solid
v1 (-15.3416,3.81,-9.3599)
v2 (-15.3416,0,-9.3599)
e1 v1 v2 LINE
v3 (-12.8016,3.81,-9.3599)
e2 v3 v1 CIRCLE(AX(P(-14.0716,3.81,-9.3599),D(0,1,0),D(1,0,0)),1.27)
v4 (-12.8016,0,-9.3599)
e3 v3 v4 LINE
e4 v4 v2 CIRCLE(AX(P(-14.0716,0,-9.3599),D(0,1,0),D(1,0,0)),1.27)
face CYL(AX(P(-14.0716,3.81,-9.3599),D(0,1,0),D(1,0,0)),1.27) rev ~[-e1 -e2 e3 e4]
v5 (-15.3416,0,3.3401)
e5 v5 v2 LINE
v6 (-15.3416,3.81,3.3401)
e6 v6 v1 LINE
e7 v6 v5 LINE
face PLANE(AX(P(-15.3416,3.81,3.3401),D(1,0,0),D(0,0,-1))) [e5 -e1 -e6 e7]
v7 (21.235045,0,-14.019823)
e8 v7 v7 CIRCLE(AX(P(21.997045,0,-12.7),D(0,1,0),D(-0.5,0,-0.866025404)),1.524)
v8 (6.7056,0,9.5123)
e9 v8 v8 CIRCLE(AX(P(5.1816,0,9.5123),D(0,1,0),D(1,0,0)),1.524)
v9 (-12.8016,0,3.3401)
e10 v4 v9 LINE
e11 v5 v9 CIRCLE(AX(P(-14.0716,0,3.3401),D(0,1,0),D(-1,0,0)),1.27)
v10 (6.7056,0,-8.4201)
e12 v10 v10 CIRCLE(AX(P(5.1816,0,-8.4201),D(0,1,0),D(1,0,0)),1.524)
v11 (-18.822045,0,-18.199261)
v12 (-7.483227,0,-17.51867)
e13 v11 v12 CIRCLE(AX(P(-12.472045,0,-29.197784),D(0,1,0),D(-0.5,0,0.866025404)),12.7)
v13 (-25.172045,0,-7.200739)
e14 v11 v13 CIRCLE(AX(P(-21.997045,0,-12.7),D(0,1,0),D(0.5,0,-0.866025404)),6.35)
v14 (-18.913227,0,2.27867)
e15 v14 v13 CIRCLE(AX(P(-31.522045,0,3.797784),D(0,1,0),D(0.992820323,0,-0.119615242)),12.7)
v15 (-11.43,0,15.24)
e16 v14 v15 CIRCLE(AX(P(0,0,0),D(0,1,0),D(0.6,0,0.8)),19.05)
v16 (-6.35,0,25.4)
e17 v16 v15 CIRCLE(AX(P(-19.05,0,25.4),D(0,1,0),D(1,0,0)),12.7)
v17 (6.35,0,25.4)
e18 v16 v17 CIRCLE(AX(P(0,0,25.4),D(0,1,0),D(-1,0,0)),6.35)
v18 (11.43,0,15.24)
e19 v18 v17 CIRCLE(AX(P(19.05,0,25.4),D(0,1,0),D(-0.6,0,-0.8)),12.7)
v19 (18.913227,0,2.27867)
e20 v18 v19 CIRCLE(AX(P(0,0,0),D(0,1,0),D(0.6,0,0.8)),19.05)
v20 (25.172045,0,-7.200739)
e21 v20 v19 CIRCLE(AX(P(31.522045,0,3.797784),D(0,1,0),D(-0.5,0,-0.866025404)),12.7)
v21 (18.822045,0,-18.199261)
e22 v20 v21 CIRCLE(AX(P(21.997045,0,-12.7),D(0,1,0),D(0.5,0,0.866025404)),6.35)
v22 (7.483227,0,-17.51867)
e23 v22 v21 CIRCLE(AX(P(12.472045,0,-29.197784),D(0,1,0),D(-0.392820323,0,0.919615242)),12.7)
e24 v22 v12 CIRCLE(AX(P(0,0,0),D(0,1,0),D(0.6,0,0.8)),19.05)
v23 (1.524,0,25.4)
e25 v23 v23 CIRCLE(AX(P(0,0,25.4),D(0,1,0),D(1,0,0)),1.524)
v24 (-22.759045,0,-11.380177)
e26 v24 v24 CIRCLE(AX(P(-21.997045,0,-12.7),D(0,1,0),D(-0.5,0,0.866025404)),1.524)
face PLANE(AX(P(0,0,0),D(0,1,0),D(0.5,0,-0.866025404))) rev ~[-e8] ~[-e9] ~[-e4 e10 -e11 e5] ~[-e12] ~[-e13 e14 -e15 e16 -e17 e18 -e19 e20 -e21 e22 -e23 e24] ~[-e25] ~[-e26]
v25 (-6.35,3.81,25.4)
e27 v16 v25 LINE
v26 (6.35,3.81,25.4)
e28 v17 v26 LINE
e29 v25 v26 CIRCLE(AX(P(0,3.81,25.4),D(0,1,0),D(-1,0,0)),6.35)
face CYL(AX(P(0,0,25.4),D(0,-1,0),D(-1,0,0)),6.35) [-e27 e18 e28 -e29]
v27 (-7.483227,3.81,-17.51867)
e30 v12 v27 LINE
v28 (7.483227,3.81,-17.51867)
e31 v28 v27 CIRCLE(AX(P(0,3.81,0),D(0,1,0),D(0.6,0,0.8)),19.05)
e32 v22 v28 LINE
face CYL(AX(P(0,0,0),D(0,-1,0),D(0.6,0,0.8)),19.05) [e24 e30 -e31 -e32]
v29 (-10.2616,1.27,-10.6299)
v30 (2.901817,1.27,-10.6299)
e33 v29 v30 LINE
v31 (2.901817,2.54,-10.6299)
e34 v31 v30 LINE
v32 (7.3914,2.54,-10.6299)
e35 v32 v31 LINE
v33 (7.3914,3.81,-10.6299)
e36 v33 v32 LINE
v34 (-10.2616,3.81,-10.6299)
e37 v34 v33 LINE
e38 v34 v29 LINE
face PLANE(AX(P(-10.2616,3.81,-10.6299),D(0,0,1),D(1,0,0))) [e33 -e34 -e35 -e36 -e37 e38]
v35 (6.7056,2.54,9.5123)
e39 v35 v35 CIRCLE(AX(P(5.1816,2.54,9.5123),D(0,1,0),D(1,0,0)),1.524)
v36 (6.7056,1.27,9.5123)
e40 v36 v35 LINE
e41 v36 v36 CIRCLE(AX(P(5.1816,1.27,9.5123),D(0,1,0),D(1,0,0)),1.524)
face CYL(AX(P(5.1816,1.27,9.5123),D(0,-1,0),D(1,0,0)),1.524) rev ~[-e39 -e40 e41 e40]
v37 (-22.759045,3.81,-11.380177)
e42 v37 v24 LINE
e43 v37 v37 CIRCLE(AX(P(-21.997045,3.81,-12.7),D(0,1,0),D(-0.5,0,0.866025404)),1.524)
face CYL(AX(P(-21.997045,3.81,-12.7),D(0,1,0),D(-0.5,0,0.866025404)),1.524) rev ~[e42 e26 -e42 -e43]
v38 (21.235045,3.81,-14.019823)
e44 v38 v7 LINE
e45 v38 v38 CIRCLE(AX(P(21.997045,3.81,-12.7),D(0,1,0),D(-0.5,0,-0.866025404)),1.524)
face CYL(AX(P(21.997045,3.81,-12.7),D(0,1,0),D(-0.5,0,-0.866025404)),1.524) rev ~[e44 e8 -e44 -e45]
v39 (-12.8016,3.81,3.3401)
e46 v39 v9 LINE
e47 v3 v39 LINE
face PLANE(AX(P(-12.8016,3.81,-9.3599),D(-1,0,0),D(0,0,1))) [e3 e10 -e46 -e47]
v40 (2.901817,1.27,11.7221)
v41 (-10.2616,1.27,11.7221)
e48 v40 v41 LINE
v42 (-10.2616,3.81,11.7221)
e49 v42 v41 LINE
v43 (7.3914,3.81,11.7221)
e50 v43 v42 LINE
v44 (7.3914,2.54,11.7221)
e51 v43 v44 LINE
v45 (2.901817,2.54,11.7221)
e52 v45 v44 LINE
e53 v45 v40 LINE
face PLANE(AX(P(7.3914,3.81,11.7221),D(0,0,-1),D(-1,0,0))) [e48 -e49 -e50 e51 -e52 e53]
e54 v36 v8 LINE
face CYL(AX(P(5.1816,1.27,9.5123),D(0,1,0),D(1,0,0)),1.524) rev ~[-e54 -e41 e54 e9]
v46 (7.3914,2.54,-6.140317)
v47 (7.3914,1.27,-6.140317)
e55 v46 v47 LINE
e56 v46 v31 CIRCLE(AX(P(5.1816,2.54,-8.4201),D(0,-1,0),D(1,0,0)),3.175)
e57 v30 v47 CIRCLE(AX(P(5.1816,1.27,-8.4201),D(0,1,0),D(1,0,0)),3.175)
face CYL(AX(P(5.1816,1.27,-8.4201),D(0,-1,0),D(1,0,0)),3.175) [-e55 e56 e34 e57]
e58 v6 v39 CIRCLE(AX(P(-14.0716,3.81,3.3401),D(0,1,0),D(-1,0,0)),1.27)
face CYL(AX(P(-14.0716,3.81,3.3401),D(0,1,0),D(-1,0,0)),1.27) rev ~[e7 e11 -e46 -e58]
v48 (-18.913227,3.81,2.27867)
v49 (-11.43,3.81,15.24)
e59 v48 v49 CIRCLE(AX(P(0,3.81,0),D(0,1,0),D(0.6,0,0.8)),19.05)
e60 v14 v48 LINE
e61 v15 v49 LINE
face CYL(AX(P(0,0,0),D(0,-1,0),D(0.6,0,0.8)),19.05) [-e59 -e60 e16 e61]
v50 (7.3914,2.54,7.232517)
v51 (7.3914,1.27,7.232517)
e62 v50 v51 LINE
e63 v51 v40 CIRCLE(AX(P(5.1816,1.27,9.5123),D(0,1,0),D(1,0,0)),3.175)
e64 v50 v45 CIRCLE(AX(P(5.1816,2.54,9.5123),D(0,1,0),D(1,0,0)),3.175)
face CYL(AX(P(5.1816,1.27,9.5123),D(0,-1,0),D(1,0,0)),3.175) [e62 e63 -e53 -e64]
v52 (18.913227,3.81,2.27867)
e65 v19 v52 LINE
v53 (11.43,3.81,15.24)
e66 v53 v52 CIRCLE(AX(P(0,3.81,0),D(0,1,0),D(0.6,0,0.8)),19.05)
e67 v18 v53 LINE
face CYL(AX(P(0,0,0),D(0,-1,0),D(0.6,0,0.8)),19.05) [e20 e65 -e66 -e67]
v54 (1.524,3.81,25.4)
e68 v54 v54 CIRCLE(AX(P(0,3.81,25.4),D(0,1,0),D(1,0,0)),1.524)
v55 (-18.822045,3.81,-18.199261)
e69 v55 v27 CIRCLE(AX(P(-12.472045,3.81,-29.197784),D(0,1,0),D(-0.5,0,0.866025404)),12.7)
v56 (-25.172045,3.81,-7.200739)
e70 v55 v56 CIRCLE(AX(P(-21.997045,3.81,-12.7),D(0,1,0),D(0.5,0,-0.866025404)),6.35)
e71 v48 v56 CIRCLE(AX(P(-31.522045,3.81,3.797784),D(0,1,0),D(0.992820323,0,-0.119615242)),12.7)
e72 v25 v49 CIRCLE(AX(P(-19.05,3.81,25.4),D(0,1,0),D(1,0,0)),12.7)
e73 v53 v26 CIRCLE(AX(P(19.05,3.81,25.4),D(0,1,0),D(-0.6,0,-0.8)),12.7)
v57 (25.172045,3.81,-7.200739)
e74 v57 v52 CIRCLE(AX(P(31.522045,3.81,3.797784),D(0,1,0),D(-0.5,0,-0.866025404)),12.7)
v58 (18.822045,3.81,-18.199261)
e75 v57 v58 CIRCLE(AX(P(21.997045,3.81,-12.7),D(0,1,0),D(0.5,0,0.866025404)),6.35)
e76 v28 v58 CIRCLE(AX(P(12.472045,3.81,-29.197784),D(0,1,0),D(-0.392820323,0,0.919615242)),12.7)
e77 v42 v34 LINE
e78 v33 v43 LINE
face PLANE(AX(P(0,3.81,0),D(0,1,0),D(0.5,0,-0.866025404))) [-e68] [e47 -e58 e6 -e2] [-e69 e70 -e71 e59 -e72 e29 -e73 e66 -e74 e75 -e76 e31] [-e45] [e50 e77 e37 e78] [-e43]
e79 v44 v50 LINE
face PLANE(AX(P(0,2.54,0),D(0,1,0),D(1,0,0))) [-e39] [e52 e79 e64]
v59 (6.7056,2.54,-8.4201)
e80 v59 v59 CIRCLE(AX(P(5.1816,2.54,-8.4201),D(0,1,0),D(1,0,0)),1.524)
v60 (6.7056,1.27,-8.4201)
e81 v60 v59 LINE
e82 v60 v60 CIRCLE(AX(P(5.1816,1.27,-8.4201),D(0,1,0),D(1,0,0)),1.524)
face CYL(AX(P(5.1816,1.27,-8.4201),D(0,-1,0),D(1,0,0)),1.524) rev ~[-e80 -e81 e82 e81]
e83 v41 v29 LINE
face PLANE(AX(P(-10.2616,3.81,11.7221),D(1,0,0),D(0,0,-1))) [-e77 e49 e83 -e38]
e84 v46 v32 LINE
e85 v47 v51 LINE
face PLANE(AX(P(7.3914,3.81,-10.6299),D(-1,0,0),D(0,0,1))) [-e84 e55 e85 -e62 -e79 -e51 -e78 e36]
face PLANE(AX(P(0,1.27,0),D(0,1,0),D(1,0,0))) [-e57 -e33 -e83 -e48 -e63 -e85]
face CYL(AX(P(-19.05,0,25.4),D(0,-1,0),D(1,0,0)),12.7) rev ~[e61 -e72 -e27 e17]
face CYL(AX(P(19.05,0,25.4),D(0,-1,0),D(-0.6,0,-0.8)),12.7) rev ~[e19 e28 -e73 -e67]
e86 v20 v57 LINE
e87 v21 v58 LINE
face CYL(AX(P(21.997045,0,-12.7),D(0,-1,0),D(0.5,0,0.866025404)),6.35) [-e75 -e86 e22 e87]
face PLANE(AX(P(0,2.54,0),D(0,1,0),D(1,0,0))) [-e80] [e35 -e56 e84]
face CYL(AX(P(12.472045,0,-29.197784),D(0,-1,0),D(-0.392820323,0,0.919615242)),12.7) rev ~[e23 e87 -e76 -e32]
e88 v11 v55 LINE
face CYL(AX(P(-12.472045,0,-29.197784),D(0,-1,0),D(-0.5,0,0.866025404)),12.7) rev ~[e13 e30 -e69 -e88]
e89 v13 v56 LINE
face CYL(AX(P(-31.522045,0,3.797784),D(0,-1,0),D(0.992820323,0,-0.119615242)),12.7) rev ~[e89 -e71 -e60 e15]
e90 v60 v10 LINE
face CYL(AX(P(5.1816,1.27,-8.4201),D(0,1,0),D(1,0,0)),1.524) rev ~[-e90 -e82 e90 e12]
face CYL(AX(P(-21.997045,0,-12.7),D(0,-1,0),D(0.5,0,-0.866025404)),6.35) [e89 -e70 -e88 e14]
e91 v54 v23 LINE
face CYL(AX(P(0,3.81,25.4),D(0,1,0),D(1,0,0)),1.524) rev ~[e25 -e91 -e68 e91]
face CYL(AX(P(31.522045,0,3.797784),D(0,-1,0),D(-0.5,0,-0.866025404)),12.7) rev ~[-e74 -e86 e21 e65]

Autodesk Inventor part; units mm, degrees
ref_plane "YZ Plane" through (0, 0, 0) normal (1, 0, 0) x (0, 1, 0)
ref_plane "XZ Plane" through (0, 0, 0) normal (0, 1, 0) x (-1, 0, 0)
ref_plane "XY Plane" through (0, 0, 0) normal (0, 0, 1) x (1, 0, 0)
sketch "Sketch1" plane through (0, 0, 0) normal (0, 1, 0) x (-1, 0, 0)
  arc A0 (6.35, 25.4) -> (-6.35, 25.4) centre (0, 25.4) ccw
  arc A1 (-11.43, 15.24) -> (11.43, 15.24) centre (0, 0) ccw
  arc A2 (-11.43, 15.24) -> (-6.35, 25.4) centre (-19.05, 25.4) ccw
  arc A3 (6.35, 25.4) -> (11.43, 15.24) centre (19.05, 25.4) ccw
  dimension "d0" = 25.4
  dimension "d1" = 38.1
  dimension "d2" = 12.7
extrude "Extrusion1" add sketch "Sketch1" along normal blind 3.81
sketch "Sketch2" plane through (0, 3.81, 0) normal (0, 1, 0) x (1, 0, 0)
  arc A0 (-6.35, -25.4) -> (6.35, -25.4) centre (0, -25.4) ccw projected
  circle A1 centre (0, -25.4) radius 1.524
  dimension "d5" = 3.048
extrude "Extrusion2" cut sketch "Sketch2" against normal through all
pattern_circular "Circular Pattern1" count 3 over 360 about axis through (0, 0, 0) along (0, 1, 0) of "Extrusion2", "Extrusion1"
sketch "Sketch3" plane through (0, 3.81, 0) normal (0, 1, 0) x (1, 0, 0)
  arc A0 (11.43, -15.24) -> (18.9132, -2.2787) centre (0, 0) ccw projected
  line L0 (-10.2616, 10.6299) -> (7.3914, 10.6299)
  line L1 (7.3914, 10.6299) -> (7.3914, -11.7221)
  line L2 (7.3914, -11.7221) -> (-10.2616, -11.7221)
  line L3 (-10.2616, -11.7221) -> (-10.2616, 10.6299)
  dimension "d11" = 22.352
  dimension "d12" = 17.653
  dimension "d14" = 10.6299
  dimension "d29" = 7.3914
extrude "Extrusion3" cut sketch "Sketch3" against normal blind 2.54
sketch "Sketch4" plane through (0, 1.27, 0) normal (0, 1, 0) x (1, 0, 0)
  line L0 (-10.2616, 10.6299) -> (7.3914, 10.6299) projected
  line L1 (7.3914, -11.7221) -> (-10.2616, -11.7221) projected
  line L2 (7.3914, 10.6299) -> (7.3914, -11.7221) projected
  circle A0 centre (5.1816, 8.4201) radius 1.524
  circle A1 centre (5.1816, -9.5123) radius 1.524
  point P0 (0, 0)
  dimension "d17" = 3.048
  dimension "d18" = 2.2098
  dimension "d19" = 2.2098
  dimension "d20" = 2.2098
extrude "Extrusion4" cut sketch "Sketch4" against normal through all
sketch "Sketch5" plane through (0, 1.27, 0) normal (0, 1, 0) x (1, 0, 0)
  circle A0 centre (5.1816, 8.4201) radius 1.524 projected
  circle A1 centre (5.1816, -9.5123) radius 1.524 projected
  line L0 (-10.2616, 10.6299) -> (7.3914, 10.6299) projected
  circle A2 centre (5.1816, 8.4201) radius 3.175
  circle A3 centre (5.1816, -9.5123) radius 3.175
  point P0 (0, 0)
  dimension "d31" = 6.35
extrude "Extrusion5" add sketch "Sketch5" along normal blind 1.27
sketch "Sketch6" plane through (0, 3.81, 0) normal (0, 1, 0) x (1, 0, 0)
  line L0 (-10.2616, -11.7221) -> (-10.2616, 10.6299) projected
  line L1 (-10.2616, 10.6299) -> (7.3914, 10.6299) projected
  line L2 (-12.8016, 9.3599) -> (-12.8016, -3.3401)
  line L3 (-15.3416, -3.3401) -> (-15.3416, 9.3599)
  arc A0 (-12.8016, 9.3599) -> (-15.3416, 9.3599) centre (-14.0716, 9.3599) ccw
  arc A1 (-15.3416, -3.3401) -> (-12.8016, -3.3401) centre (-14.0716, -3.3401) ccw
  point P0 (-12.8016, -11.7221)
  dimension "d25" = 2.54
  dimension "d26" = 2.54
  dimension "d30" = 12.7
extrude "Extrusion6" cut sketch "Sketch6" against normal through all
equation "\"d19\" = d18"
equation "\"d20\" = d18"
properties part number "Gyro Mount"
